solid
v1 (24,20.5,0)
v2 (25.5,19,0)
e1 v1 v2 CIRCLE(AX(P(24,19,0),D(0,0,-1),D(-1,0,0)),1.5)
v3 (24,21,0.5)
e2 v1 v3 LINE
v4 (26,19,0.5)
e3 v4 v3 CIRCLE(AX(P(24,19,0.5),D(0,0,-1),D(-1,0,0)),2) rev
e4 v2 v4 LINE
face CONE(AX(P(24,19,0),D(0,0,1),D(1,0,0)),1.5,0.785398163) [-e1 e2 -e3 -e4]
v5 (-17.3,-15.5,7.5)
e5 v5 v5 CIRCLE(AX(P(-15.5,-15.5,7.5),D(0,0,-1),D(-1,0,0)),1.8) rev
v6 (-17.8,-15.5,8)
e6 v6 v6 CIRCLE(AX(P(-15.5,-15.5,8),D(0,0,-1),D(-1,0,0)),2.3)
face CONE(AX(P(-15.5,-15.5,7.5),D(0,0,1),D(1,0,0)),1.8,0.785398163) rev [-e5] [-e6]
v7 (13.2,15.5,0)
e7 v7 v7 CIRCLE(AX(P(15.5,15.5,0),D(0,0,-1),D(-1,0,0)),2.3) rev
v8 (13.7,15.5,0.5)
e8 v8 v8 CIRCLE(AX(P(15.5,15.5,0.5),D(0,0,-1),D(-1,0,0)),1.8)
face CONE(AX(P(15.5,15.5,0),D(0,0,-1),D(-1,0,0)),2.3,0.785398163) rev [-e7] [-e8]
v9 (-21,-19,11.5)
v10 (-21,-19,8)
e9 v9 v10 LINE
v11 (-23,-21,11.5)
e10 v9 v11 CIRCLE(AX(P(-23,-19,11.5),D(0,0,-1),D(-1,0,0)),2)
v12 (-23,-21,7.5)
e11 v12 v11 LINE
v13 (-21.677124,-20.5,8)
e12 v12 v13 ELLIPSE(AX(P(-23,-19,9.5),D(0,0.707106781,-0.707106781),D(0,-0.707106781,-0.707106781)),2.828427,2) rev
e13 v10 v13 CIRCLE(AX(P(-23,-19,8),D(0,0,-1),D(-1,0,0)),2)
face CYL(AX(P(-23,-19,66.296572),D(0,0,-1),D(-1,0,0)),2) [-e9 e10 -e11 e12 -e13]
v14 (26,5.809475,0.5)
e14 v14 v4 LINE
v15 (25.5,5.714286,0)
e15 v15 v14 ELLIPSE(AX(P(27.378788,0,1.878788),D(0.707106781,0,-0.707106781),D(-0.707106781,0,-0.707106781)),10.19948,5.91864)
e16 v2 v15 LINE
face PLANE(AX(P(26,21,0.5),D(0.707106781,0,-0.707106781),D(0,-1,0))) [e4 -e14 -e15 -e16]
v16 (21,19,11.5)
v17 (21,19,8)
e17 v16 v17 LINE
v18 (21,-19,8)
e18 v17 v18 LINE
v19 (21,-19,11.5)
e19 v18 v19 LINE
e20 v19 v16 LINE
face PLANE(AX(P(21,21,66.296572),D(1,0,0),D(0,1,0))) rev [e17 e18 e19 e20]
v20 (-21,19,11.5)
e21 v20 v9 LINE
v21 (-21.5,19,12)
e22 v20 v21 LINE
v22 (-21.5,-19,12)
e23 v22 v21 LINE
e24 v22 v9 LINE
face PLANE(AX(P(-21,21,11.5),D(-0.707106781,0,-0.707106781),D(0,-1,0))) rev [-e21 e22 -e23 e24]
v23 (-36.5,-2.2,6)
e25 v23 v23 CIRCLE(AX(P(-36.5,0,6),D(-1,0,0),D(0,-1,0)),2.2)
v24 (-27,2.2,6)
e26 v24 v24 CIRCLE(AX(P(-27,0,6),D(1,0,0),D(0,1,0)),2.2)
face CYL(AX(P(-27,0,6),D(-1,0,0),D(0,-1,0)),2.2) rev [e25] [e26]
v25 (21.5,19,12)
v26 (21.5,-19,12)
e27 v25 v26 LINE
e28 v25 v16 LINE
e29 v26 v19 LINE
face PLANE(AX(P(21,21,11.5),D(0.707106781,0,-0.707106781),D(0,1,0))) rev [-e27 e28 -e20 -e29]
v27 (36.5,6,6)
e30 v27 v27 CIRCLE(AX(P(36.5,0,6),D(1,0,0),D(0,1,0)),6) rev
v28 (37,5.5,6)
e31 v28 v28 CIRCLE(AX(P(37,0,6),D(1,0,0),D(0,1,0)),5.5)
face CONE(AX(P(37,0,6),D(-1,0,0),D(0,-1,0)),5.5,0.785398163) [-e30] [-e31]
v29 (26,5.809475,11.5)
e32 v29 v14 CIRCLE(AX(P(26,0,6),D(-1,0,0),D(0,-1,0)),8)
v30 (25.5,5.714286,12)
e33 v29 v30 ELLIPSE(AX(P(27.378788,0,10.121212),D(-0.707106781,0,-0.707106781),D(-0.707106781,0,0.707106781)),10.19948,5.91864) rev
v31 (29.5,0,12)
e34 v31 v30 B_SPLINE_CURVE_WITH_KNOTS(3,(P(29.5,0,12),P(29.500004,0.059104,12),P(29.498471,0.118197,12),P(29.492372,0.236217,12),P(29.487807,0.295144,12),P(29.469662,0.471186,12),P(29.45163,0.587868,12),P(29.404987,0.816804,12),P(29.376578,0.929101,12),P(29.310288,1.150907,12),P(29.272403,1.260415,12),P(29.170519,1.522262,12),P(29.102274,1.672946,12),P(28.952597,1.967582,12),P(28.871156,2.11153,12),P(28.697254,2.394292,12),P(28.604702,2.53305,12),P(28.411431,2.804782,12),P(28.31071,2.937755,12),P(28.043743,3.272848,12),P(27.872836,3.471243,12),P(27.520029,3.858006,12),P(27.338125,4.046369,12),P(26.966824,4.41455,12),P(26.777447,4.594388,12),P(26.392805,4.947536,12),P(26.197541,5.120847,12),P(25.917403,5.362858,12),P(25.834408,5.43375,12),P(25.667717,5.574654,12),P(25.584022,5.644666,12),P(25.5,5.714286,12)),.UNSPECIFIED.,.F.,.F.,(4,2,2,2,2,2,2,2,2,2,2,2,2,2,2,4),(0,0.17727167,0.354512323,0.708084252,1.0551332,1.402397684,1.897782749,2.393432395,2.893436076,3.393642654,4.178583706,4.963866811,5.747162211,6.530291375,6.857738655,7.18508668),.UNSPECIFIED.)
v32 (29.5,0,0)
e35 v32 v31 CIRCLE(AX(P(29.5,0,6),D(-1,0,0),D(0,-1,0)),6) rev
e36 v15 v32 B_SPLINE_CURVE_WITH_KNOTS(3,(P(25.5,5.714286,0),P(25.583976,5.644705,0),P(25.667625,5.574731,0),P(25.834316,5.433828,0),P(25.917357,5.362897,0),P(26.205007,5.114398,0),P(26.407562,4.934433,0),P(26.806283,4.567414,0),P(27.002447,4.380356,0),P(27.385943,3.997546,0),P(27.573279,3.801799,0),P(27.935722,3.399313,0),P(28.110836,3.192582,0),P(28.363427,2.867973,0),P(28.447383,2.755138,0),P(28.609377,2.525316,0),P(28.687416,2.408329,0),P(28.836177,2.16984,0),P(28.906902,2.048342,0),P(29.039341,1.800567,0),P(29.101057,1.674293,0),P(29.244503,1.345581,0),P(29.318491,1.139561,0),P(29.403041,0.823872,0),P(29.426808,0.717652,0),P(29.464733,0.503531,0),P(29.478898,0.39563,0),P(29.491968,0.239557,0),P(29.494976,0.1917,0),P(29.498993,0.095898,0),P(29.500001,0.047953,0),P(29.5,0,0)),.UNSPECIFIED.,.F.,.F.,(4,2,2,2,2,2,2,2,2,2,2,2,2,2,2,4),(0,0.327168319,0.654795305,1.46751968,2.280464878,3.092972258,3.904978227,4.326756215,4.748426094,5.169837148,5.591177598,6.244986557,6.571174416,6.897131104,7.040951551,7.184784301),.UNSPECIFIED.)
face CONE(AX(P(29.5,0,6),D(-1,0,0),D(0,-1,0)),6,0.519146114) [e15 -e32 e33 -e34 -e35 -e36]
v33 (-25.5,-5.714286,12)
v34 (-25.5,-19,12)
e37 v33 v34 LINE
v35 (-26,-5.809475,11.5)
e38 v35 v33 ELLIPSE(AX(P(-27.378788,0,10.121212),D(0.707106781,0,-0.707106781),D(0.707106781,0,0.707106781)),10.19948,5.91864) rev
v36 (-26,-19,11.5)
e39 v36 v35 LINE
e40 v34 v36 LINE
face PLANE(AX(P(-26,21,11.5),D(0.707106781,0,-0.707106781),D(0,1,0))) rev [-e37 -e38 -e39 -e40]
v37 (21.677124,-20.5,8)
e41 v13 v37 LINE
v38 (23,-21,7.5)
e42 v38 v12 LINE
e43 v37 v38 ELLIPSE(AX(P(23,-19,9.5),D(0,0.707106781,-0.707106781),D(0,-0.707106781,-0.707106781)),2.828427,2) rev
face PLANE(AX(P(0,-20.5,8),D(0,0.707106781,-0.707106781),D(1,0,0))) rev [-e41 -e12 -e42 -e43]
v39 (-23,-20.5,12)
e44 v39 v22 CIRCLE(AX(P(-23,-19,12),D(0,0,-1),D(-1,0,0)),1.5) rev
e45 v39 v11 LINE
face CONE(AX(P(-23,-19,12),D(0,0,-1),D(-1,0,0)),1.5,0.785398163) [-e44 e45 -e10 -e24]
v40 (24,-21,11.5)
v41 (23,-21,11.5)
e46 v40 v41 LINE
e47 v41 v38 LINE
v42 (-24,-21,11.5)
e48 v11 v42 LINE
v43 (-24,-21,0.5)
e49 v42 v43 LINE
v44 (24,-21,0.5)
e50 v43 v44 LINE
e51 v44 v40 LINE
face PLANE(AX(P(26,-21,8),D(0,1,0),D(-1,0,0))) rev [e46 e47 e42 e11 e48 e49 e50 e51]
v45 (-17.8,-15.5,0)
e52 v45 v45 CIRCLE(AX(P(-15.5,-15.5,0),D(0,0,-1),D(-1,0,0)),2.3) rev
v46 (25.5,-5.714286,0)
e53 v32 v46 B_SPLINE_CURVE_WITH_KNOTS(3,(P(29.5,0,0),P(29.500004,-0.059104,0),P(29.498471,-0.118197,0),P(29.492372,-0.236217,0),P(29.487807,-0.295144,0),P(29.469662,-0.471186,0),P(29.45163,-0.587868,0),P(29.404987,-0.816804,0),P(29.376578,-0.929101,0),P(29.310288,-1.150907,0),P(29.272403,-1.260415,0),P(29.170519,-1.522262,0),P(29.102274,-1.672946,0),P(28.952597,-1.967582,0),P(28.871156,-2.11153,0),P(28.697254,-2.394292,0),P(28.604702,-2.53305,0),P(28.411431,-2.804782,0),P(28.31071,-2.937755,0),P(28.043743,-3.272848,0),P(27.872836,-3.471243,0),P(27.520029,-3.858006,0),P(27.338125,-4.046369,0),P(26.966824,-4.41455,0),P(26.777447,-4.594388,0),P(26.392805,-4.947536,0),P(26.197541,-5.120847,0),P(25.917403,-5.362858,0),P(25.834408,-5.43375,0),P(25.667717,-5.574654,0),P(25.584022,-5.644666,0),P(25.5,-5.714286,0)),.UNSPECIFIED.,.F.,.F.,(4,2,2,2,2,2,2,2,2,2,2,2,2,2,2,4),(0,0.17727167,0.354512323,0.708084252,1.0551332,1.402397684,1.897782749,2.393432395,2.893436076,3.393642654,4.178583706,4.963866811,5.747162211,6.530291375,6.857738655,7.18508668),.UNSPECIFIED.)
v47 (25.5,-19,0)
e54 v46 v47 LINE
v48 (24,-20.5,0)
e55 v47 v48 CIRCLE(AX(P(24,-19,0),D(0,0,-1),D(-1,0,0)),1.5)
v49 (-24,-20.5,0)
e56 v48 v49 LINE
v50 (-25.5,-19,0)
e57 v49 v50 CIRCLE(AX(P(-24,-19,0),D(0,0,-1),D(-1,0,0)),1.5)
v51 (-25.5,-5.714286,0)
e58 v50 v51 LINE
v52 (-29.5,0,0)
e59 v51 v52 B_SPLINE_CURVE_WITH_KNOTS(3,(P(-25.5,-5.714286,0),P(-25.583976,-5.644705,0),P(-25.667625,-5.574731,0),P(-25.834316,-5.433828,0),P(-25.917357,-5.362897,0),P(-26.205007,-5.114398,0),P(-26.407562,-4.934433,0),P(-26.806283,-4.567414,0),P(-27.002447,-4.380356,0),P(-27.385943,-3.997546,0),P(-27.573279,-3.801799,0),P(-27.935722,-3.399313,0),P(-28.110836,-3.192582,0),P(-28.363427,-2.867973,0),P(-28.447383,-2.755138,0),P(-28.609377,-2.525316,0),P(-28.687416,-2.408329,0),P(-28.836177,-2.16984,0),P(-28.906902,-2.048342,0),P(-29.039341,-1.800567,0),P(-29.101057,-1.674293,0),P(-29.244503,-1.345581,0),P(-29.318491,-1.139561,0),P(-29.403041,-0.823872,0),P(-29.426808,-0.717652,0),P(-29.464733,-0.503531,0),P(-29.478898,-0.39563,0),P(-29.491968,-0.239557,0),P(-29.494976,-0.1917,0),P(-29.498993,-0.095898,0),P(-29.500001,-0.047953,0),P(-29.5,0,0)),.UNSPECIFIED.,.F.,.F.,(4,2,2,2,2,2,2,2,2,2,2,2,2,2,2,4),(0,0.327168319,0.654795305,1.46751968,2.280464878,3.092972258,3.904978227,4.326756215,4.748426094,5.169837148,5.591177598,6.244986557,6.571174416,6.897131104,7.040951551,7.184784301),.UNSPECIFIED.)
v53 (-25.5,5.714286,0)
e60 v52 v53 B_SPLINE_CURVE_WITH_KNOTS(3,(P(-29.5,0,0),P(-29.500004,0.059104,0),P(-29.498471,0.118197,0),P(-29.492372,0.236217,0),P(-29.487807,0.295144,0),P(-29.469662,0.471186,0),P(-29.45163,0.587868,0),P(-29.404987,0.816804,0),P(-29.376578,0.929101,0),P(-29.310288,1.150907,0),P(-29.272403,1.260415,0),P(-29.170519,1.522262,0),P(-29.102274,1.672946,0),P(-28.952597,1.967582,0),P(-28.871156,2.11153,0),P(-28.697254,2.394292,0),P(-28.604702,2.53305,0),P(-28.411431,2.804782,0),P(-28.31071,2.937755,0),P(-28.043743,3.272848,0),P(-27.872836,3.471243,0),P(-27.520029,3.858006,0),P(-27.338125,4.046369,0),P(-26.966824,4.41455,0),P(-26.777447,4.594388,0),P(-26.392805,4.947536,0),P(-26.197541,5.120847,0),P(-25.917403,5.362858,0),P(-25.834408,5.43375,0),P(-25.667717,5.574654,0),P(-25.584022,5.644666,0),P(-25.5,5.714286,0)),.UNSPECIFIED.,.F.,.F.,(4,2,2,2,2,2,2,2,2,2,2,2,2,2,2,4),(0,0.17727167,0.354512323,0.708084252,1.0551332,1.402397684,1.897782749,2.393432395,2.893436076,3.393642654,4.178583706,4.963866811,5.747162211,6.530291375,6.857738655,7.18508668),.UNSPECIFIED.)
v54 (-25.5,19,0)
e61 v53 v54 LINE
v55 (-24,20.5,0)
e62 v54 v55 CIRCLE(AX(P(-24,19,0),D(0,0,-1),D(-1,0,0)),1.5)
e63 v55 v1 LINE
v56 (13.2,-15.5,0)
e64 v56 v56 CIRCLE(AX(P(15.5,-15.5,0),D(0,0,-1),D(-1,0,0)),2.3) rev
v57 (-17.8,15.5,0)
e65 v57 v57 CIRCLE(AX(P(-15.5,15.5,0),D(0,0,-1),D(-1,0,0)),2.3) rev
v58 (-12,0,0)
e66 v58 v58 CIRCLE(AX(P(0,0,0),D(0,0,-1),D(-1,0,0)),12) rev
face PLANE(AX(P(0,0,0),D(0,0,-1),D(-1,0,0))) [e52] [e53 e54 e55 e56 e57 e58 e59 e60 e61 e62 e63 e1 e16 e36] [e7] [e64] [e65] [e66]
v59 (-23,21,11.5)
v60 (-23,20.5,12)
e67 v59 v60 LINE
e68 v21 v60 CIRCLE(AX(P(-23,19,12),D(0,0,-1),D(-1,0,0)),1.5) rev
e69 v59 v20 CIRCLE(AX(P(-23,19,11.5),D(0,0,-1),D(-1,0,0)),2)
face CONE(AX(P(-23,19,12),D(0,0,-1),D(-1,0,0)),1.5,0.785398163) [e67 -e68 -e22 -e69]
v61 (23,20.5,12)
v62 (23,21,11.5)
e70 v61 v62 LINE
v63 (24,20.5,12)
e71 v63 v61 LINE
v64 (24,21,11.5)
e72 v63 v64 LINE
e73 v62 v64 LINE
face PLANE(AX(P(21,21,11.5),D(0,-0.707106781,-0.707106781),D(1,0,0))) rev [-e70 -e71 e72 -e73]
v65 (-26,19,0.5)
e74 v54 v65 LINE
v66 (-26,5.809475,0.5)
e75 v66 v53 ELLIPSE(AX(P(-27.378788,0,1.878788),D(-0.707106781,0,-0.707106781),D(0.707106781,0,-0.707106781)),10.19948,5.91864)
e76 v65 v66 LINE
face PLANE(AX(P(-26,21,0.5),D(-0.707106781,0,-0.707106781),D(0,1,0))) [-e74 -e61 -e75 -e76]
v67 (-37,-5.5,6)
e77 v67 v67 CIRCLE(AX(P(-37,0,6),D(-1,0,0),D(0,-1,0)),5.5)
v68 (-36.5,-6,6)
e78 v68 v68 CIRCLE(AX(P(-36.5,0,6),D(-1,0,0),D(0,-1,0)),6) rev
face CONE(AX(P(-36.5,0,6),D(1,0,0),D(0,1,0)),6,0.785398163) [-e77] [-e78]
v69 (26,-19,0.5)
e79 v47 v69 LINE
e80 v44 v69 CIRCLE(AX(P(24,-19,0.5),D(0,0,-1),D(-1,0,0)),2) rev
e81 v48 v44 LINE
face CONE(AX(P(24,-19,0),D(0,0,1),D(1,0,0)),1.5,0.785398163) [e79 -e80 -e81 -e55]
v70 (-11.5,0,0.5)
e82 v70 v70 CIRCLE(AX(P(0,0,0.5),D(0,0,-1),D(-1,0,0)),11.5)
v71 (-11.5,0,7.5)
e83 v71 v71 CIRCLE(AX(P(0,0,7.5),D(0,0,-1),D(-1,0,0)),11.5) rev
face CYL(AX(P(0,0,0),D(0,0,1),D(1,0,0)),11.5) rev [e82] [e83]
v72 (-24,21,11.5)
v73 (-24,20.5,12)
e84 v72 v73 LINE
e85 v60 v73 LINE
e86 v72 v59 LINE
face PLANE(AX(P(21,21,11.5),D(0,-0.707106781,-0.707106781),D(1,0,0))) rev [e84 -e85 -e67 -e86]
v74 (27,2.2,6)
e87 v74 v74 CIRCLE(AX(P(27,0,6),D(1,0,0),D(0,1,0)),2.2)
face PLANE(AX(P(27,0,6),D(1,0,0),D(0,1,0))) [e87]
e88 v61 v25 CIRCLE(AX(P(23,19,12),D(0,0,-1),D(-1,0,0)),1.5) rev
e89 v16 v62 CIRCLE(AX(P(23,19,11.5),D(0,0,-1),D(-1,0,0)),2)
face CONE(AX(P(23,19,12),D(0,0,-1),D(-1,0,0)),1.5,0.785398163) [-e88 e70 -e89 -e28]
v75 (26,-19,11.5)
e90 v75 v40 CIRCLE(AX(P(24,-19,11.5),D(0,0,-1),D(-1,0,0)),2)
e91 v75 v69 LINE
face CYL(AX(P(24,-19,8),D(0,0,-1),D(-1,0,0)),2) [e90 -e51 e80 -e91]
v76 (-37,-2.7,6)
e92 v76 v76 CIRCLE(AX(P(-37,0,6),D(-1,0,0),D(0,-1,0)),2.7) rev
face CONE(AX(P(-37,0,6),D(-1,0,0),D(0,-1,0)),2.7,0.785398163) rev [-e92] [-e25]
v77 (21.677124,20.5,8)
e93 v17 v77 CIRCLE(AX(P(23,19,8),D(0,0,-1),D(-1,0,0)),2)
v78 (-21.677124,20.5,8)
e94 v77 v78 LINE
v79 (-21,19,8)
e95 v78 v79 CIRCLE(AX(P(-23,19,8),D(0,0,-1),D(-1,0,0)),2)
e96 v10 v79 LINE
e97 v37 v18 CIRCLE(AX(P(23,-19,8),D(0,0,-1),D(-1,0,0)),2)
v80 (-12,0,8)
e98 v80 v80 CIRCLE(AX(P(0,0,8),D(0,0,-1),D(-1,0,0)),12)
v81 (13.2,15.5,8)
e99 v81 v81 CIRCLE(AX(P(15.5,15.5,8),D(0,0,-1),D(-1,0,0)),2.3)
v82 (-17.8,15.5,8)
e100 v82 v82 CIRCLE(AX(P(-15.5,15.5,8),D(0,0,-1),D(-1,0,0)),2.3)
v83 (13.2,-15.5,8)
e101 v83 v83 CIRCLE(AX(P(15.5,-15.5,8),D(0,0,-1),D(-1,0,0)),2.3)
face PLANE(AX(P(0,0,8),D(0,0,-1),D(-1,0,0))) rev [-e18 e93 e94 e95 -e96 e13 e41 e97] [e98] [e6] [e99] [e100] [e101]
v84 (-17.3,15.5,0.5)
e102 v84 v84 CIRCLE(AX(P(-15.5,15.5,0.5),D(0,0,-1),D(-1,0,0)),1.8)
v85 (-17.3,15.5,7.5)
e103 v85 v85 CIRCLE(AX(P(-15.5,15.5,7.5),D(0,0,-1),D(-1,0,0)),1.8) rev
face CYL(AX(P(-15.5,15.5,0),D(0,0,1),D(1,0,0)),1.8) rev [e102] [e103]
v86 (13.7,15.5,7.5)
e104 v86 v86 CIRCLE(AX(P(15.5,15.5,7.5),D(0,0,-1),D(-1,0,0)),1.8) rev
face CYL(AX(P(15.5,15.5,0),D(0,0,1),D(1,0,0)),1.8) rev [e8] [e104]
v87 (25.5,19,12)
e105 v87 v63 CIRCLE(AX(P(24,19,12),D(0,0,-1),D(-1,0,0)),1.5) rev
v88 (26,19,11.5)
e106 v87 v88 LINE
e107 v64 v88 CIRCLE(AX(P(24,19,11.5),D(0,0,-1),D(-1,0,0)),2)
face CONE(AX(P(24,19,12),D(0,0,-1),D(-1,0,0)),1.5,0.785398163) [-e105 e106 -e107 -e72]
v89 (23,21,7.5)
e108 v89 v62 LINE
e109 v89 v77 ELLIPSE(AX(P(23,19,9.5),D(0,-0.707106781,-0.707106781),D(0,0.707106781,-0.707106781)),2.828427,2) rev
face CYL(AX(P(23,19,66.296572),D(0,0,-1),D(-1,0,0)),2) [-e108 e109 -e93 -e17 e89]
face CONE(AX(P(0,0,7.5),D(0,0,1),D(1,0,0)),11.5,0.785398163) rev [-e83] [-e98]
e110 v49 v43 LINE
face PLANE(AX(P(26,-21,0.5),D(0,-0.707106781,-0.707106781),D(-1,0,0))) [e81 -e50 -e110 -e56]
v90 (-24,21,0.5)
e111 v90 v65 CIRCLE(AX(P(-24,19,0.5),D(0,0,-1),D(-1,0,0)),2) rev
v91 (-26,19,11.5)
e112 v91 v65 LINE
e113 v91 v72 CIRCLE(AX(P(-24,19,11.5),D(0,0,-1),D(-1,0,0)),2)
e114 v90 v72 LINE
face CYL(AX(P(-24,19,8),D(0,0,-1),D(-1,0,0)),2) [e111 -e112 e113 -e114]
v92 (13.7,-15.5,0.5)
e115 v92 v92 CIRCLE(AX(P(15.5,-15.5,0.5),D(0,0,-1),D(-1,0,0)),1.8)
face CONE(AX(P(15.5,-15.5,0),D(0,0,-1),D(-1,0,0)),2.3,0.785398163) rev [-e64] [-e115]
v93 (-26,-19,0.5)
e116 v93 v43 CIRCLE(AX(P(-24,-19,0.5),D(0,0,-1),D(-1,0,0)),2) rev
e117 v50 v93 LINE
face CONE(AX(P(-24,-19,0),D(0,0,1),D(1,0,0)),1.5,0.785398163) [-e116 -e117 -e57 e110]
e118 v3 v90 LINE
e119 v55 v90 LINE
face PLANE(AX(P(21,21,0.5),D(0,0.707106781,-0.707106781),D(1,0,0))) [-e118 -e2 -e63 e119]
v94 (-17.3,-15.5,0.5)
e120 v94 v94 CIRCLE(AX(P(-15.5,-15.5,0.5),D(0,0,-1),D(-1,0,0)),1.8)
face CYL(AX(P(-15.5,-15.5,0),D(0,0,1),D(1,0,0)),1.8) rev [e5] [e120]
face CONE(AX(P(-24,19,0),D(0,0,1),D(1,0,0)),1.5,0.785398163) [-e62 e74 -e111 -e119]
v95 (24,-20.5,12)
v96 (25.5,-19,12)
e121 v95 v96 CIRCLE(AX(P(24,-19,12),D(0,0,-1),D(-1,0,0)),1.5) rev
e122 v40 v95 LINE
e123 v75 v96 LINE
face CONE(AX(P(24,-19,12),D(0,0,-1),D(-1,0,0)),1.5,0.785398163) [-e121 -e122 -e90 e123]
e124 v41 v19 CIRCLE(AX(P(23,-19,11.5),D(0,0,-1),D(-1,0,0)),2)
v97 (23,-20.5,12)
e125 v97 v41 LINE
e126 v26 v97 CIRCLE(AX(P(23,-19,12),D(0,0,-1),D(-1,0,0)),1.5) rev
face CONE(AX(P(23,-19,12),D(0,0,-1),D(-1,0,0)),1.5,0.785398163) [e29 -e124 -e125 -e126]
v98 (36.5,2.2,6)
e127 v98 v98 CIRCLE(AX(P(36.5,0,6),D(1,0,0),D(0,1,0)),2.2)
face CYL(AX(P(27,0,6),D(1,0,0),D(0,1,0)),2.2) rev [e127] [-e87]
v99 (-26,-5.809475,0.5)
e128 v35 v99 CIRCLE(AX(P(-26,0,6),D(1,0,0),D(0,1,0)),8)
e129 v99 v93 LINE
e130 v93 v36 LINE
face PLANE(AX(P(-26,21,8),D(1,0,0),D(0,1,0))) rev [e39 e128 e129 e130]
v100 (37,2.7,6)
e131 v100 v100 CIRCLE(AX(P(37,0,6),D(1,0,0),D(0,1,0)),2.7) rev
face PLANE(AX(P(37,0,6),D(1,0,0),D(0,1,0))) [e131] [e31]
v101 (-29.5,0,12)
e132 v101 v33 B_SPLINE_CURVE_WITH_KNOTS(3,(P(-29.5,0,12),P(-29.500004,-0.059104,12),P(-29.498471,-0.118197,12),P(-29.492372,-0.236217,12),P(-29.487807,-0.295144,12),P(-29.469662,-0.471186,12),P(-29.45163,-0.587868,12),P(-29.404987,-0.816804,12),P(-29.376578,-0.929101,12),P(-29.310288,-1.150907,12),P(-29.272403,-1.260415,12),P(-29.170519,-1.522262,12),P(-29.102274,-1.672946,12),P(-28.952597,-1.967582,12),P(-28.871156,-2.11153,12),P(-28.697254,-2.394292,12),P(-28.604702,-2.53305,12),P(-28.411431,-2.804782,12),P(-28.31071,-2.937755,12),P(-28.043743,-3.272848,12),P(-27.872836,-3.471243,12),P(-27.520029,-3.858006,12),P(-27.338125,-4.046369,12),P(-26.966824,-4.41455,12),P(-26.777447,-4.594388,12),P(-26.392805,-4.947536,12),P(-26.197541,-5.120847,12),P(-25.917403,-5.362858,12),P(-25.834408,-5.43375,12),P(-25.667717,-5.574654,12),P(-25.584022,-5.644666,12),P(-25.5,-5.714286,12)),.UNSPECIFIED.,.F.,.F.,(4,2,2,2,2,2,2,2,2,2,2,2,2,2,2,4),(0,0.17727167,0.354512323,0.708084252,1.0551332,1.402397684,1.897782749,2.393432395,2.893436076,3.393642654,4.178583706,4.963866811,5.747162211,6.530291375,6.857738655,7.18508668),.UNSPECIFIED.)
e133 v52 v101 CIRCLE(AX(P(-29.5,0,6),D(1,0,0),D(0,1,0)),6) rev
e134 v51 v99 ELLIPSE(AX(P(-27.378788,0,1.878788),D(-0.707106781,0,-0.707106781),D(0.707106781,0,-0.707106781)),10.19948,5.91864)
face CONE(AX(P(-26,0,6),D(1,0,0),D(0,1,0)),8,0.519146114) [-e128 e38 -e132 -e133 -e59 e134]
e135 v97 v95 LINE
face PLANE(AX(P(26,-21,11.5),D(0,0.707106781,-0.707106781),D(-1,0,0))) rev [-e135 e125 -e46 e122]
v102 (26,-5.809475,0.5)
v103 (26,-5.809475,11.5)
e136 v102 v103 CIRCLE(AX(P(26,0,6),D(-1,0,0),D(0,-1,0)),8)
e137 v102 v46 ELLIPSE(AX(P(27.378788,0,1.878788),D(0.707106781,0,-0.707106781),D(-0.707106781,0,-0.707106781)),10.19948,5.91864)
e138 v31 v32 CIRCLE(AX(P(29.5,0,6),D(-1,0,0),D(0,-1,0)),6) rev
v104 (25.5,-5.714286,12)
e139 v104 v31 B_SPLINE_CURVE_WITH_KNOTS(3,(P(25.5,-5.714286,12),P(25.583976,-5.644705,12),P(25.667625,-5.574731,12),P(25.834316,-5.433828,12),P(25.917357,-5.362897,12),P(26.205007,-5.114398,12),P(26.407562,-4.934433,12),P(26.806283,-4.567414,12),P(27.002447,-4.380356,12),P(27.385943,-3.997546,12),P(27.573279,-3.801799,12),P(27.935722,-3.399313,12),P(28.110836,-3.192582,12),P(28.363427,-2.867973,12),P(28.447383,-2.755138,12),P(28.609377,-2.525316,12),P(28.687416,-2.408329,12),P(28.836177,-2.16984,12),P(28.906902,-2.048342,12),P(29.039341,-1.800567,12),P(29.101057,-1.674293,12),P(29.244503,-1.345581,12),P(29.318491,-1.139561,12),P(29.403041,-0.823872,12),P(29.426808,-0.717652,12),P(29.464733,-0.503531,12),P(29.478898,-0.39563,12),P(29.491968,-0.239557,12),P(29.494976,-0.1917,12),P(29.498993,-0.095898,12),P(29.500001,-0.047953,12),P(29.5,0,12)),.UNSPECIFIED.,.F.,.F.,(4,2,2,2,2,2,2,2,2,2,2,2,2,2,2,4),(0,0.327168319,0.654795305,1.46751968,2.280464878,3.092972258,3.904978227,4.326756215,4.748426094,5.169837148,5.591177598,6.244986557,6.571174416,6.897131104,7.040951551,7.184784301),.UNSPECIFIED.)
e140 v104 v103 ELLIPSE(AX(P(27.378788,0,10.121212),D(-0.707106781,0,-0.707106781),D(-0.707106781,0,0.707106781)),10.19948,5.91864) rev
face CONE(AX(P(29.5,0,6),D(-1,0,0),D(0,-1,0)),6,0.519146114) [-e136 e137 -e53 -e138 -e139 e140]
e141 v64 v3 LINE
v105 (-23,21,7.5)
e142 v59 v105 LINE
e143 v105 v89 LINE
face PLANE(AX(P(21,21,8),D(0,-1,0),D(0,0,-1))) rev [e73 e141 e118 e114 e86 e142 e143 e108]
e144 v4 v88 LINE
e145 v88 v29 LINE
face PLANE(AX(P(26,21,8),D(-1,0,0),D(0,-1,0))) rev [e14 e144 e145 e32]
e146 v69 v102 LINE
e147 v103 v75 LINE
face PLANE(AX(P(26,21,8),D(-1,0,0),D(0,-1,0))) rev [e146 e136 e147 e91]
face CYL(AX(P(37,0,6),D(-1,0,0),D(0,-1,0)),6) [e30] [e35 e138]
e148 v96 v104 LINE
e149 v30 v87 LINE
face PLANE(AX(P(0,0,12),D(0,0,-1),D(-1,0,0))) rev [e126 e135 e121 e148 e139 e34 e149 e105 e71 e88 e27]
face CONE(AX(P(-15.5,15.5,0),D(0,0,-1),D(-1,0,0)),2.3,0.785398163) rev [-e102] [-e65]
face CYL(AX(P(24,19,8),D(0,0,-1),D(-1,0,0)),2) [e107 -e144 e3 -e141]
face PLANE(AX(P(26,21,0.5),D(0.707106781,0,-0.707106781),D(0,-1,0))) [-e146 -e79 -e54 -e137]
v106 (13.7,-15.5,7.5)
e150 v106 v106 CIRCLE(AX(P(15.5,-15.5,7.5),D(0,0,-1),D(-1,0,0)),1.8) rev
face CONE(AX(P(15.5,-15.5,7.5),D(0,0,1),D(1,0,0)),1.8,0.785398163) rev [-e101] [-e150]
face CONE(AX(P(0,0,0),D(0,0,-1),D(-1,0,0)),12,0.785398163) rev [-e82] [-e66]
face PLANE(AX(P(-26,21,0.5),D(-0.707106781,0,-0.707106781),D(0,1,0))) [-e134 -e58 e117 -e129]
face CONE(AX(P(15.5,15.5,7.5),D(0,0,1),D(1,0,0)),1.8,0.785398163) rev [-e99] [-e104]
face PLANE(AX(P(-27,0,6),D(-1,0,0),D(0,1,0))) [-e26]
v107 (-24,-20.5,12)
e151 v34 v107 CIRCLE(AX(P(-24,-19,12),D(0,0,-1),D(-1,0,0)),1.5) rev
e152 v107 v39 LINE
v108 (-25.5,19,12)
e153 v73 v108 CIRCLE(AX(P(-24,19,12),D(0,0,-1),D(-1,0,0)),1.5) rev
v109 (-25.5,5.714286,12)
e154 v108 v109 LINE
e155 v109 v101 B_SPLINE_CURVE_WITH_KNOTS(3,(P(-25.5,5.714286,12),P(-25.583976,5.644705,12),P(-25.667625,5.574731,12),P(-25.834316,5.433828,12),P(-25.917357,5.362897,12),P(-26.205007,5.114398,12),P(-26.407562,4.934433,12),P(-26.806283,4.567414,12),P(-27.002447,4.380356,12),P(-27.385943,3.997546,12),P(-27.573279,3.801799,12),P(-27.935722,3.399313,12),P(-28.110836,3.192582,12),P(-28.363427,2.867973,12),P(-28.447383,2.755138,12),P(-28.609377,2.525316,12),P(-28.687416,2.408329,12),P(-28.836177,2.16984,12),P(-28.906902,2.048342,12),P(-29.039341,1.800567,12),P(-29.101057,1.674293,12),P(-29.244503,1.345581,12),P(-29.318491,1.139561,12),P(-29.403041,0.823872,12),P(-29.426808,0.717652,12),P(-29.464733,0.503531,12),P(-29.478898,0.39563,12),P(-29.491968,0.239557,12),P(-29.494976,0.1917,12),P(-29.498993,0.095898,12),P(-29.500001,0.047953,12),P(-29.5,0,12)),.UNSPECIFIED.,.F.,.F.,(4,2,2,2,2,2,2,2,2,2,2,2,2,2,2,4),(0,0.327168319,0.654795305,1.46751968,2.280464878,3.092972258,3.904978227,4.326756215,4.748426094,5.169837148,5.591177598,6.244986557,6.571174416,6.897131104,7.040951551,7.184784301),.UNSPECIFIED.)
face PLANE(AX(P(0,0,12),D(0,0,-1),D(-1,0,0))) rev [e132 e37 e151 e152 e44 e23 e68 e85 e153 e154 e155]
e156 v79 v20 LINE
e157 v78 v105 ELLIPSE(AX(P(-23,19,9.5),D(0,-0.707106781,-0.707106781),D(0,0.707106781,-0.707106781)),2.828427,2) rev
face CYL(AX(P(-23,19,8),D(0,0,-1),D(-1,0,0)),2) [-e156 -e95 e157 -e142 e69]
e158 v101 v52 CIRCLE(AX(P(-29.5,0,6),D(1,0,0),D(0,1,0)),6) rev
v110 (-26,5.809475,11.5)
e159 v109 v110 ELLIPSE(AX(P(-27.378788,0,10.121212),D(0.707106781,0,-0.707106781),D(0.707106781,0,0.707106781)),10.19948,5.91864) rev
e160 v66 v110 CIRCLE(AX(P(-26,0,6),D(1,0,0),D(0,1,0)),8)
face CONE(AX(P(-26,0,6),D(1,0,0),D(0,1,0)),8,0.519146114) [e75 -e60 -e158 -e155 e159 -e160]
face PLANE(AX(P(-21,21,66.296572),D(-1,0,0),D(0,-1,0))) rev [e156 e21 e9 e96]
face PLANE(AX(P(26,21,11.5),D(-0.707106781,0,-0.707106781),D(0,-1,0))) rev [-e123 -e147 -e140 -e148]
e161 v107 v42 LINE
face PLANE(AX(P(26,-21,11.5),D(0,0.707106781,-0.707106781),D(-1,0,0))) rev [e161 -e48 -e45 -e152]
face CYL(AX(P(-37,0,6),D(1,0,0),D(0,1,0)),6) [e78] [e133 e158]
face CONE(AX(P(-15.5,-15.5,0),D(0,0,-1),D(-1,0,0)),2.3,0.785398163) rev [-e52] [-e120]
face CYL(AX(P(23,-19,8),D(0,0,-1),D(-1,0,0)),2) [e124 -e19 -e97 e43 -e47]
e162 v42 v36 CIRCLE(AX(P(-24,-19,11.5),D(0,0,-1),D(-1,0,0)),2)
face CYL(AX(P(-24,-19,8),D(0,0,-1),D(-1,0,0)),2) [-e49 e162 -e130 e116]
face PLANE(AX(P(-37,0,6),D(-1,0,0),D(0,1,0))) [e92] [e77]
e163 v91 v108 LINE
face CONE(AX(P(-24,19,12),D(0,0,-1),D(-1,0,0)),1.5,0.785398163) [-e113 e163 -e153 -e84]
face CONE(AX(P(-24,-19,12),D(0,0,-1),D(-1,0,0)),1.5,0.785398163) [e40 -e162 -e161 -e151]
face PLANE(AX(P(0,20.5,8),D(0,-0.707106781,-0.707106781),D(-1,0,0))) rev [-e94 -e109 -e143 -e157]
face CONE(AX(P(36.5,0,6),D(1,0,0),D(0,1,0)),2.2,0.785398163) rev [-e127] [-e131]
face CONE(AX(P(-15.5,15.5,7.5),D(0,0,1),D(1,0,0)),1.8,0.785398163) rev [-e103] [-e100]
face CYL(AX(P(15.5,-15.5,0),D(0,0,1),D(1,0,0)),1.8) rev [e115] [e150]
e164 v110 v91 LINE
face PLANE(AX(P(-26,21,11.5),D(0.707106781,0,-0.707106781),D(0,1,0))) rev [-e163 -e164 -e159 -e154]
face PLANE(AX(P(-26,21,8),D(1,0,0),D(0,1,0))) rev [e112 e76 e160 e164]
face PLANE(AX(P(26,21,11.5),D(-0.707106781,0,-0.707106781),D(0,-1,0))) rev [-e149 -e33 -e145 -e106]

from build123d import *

# Parameters (mm, degrees)
AUFSATZ_LINEAR_AUSTRAGEN1_DEPTH = 8
SKIZZE2_W                       = 5
SKIZZE2_H                       = 42
AUFSATZ_LINEAR_AUSTRAGEN2_DEPTH = 4
SKIZZE3_R                       = 6
AUFSATZ_LINEAR_AUSTRAGEN3_DEPTH = 11
SKIZZE5_R                       = 2.2
SCHNITT_LINEAR_AUSTRAGEN2_DEPTH = 10
SKIZZE4_R                       = 11.5
SKIZZE4_R_2                     = 1.8
SCHNITT_LINEAR_AUSTRAGEN1_DEPTH = 8
FASE1_SIZE                      = 2
FASE1_SIZE_2                    = 3.5
FASE2_SIZE                      = 2
FASE2_SIZE_2                    = 3.5
VERRUNDUNG1_R                   = 2
FASE3_SIZE                      = 0.5


with BuildPart() as part:
    # Skizze1 → Aufsatz-Linear austragen1 (new body)
    with BuildSketch(Plane.XY):
        Polygon((21, 21), (26, 21), (26, -21), (21, -21), (-21, -21), (-26, -21), (-26, 21), (-21, 21), align=None)
    extrude(amount=AUFSATZ_LINEAR_AUSTRAGEN1_DEPTH)

    # Skizze2 → Aufsatz-Linear austragen2 (add)
    with BuildSketch(Plane.XY.offset(8)):
        with Locations((23.5, 0)):
            Rectangle(SKIZZE2_W, SKIZZE2_H)
        with Locations((-23.5, 0)):
            Rectangle(SKIZZE2_W, SKIZZE2_H)
    extrude(amount=AUFSATZ_LINEAR_AUSTRAGEN2_DEPTH)

    # Skizze3 → Aufsatz-Linear austragen3 (add)
    with BuildSketch(Plane(origin=(26, 0, 0), x_dir=(0, 0, -1), z_dir=(1, 0, 0))):
        with Locations((-6, 0)):
            Circle(SKIZZE3_R)
    aufsatz_linear_austragen3 = extrude(amount=AUFSATZ_LINEAR_AUSTRAGEN3_DEPTH)

    # Skizze5 → Schnitt-Linear austragen2 (cut)
    with BuildSketch(Plane(origin=(37, 0, 0), x_dir=(0, 0, -1), z_dir=(1, 0, 0))):
        with Locations(Location((-6, 0, 0), (0, 0, 90))):
            Circle(SKIZZE5_R)
    schnitt_linear_austragen2 = extrude(amount=-SCHNITT_LINEAR_AUSTRAGEN2_DEPTH, mode=Mode.SUBTRACT)

    # Spiegeln1: Aufsatz-Linear austragen3, Schnitt-Linear austragen2 across plane
    add(aufsatz_linear_austragen3.mirror(Plane(origin=(0, 0, 0), x_dir=(0, 0, 1), z_dir=(1, 0, 0))))
    add(schnitt_linear_austragen2.mirror(Plane(origin=(0, 0, 0), x_dir=(0, 0, 1), z_dir=(1, 0, 0))), mode=Mode.SUBTRACT)

    # Skizze4 → Schnitt-Linear austragen1 (cut)
    with BuildSketch(Plane.XY.offset(8)):
        Circle(SKIZZE4_R)
        with Locations((-15.5, 15.5)):
            Circle(SKIZZE4_R_2)
        with Locations((15.5, 15.5)):
            Circle(SKIZZE4_R_2)
        with Locations((15.5, -15.5)):
            Circle(SKIZZE4_R_2)
        with Locations((-15.5, -15.5)):
            Circle(SKIZZE4_R_2)
    extrude(amount=-SCHNITT_LINEAR_AUSTRAGEN1_DEPTH, mode=Mode.SUBTRACT)

    # Fase1
    # the kernel refuses this chamfer: 3.5, 2 mm, written as the material it adds along each edge
    with BuildSketch(Plane(origin=(26, 0, 6), x_dir=(0, 0, -1), z_dir=(0, -1, 0))) as fase1_piece_1_section:
        Polygon((6 + FASE1_SIZE, 0), (6, FASE1_SIZE_2), (6, 0), align=None)
    fase1_piece_1 = revolve(axis=Axis((26, 0, 6), (1, 0, 0)), revolution_arc=180.000000388, mode=Mode.PRIVATE)
    fase1_piece_1 = split(fase1_piece_1, bisect_by=Plane(origin=(27.731298747, 6.967272798, 0), z_dir=(0, 0, 1)), keep=Keep.TOP, mode=Mode.PRIVATE)
    fase1_piece_1 = split(fase1_piece_1, bisect_by=Plane(origin=(27.731298747, 6.967272798, 12), z_dir=(0, 0, -1)), keep=Keep.TOP, mode=Mode.PRIVATE)
    add(fase1_piece_1)
    with BuildSketch(Plane(origin=(26, 0, 6), x_dir=(0, -6.764954696085317e-09, 1.0), z_dir=(0, 1.0, 6.764954696085317e-09))) as fase1_piece_2_section:
        Polygon((6 + FASE1_SIZE, 0), (6, FASE1_SIZE_2), (6, 0), align=None)
    fase1_piece_2 = revolve(axis=Axis((26, 0, 6), (1, 0, 0)), revolution_arc=179.999999612, mode=Mode.PRIVATE)
    fase1_piece_2 = split(fase1_piece_2, bisect_by=Plane(origin=(27.731298743, -6.9672728, 0), z_dir=(0, 0, 1)), keep=Keep.TOP, mode=Mode.PRIVATE)
    fase1_piece_2 = split(fase1_piece_2, bisect_by=Plane(origin=(27.731298743, -6.9672728, 12), z_dir=(0, 0, -1)), keep=Keep.TOP, mode=Mode.PRIVATE)
    add(fase1_piece_2)

    # Fase2
    # the kernel refuses this chamfer: 3.5, 2 mm, written as the material it adds along each edge
    with BuildSketch(Plane(origin=(-26, 0, 6), x_dir=(0, 0, -1), z_dir=(0, -1, 0))) as fase2_piece_1_section:
        Polygon((6 + FASE2_SIZE, 0), (6, -FASE2_SIZE_2), (6, 0), align=None)
    fase2_piece_1 = revolve(axis=Axis((-26, 0, 6), (1, 0, 0)), revolution_arc=180.000000388, mode=Mode.PRIVATE)
    fase2_piece_1 = split(fase2_piece_1, bisect_by=Plane(origin=(-27.731298747, 6.967272798, 0), z_dir=(0, 0, 1)), keep=Keep.TOP, mode=Mode.PRIVATE)
    fase2_piece_1 = split(fase2_piece_1, bisect_by=Plane(origin=(-27.731298747, 6.967272798, 12), z_dir=(0, 0, -1)), keep=Keep.TOP, mode=Mode.PRIVATE)
    add(fase2_piece_1)
    with BuildSketch(Plane(origin=(-26, 0, 6), x_dir=(0, -6.764954696085317e-09, 1.0), z_dir=(0, 1.0, 6.764954696085317e-09))) as fase2_piece_2_section:
        Polygon((6 + FASE2_SIZE, 0), (6, -FASE2_SIZE_2), (6, 0), align=None)
    fase2_piece_2 = revolve(axis=Axis((-26, 0, 6), (1, 0, 0)), revolution_arc=179.999999612, mode=Mode.PRIVATE)
    fase2_piece_2 = split(fase2_piece_2, bisect_by=Plane(origin=(-27.731298743, -6.9672728, 0), z_dir=(0, 0, 1)), keep=Keep.TOP, mode=Mode.PRIVATE)
    fase2_piece_2 = split(fase2_piece_2, bisect_by=Plane(origin=(-27.731298743, -6.9672728, 12), z_dir=(0, 0, -1)), keep=Keep.TOP, mode=Mode.PRIVATE)
    add(fase2_piece_2)

    # Verrundung1
    verrundung1_edges = [part.edges().sort_by_distance(p)[0] for p in [
        (26, 21, 6),
        (26, -21, 6),
        (-26, -21, 6),
        (-26, 21, 6),
        (21, -21, 10),
        (21, 21, 10),
        (-21, 21, 10),
        (-21, -21, 10),
    ]]
    fillet(verrundung1_edges, radius=VERRUNDUNG1_R)

    # Fase3
    fase3_edges = [part.edges().sort_by_distance(p)[0] for p in [
        (-26, -12.145751311, 0),
        (-26, 12.145751311, 12),
        (-21, 0, 12),
        (0, -21, 0),
        (23.5, -21, 12),
        (-23.5, -21, 12),
        (-23.5, 21, 12),
        (-26, -12.145751311, 12),
        (-25.414213562, 20.414213562, 12),
        (-25.414213562, -20.414213562, 12),
        (-21.585786438, 20.414213562, 12),
        (-21.585786438, -20.414213562, 12),
        (21, 0, 12),
        (26, 12.145751311, 12),
        (23.5, 21, 12),
        (25.414213562, 20.414213562, 12),
        (25.414213562, -20.414213562, 12),
        (21.585786438, 20.414213562, 12),
        (21.585786438, -20.414213562, 12),
        (0, 21, 0),
        (-26, 12.145751311, 0),
        (26, -12.145751311, 0),
        (25.414213562, 20.414213562, 0),
        (-25.414213562, 20.414213562, 0),
        (25.414213562, -20.414213562, 0),
        (-25.414213562, -20.414213562, 0),
        (0, 21, 8),
        (0, -21, 8),
        (37, 0, 12),
        (37, -2.2, 6),
        (-37, 0, 12),
        (-37, -2.2, 6),
        (-17.3, -15.5, 0),
        (-17.3, -15.5, 8),
        (13.7, -15.5, 0),
        (13.7, -15.5, 8),
        (13.7, 15.5, 0),
        (13.7, 15.5, 8),
        (-17.3, 15.5, 0),
        (-17.3, 15.5, 8),
        (-11.5, 0, 0),
        (-11.5, 0, 8),
        (26, -12.145751311, 12),
        (26, 12.145751311, 0),
    ]]
    chamfer(fase3_edges, length=FASE3_SIZE)


solid = part.part
